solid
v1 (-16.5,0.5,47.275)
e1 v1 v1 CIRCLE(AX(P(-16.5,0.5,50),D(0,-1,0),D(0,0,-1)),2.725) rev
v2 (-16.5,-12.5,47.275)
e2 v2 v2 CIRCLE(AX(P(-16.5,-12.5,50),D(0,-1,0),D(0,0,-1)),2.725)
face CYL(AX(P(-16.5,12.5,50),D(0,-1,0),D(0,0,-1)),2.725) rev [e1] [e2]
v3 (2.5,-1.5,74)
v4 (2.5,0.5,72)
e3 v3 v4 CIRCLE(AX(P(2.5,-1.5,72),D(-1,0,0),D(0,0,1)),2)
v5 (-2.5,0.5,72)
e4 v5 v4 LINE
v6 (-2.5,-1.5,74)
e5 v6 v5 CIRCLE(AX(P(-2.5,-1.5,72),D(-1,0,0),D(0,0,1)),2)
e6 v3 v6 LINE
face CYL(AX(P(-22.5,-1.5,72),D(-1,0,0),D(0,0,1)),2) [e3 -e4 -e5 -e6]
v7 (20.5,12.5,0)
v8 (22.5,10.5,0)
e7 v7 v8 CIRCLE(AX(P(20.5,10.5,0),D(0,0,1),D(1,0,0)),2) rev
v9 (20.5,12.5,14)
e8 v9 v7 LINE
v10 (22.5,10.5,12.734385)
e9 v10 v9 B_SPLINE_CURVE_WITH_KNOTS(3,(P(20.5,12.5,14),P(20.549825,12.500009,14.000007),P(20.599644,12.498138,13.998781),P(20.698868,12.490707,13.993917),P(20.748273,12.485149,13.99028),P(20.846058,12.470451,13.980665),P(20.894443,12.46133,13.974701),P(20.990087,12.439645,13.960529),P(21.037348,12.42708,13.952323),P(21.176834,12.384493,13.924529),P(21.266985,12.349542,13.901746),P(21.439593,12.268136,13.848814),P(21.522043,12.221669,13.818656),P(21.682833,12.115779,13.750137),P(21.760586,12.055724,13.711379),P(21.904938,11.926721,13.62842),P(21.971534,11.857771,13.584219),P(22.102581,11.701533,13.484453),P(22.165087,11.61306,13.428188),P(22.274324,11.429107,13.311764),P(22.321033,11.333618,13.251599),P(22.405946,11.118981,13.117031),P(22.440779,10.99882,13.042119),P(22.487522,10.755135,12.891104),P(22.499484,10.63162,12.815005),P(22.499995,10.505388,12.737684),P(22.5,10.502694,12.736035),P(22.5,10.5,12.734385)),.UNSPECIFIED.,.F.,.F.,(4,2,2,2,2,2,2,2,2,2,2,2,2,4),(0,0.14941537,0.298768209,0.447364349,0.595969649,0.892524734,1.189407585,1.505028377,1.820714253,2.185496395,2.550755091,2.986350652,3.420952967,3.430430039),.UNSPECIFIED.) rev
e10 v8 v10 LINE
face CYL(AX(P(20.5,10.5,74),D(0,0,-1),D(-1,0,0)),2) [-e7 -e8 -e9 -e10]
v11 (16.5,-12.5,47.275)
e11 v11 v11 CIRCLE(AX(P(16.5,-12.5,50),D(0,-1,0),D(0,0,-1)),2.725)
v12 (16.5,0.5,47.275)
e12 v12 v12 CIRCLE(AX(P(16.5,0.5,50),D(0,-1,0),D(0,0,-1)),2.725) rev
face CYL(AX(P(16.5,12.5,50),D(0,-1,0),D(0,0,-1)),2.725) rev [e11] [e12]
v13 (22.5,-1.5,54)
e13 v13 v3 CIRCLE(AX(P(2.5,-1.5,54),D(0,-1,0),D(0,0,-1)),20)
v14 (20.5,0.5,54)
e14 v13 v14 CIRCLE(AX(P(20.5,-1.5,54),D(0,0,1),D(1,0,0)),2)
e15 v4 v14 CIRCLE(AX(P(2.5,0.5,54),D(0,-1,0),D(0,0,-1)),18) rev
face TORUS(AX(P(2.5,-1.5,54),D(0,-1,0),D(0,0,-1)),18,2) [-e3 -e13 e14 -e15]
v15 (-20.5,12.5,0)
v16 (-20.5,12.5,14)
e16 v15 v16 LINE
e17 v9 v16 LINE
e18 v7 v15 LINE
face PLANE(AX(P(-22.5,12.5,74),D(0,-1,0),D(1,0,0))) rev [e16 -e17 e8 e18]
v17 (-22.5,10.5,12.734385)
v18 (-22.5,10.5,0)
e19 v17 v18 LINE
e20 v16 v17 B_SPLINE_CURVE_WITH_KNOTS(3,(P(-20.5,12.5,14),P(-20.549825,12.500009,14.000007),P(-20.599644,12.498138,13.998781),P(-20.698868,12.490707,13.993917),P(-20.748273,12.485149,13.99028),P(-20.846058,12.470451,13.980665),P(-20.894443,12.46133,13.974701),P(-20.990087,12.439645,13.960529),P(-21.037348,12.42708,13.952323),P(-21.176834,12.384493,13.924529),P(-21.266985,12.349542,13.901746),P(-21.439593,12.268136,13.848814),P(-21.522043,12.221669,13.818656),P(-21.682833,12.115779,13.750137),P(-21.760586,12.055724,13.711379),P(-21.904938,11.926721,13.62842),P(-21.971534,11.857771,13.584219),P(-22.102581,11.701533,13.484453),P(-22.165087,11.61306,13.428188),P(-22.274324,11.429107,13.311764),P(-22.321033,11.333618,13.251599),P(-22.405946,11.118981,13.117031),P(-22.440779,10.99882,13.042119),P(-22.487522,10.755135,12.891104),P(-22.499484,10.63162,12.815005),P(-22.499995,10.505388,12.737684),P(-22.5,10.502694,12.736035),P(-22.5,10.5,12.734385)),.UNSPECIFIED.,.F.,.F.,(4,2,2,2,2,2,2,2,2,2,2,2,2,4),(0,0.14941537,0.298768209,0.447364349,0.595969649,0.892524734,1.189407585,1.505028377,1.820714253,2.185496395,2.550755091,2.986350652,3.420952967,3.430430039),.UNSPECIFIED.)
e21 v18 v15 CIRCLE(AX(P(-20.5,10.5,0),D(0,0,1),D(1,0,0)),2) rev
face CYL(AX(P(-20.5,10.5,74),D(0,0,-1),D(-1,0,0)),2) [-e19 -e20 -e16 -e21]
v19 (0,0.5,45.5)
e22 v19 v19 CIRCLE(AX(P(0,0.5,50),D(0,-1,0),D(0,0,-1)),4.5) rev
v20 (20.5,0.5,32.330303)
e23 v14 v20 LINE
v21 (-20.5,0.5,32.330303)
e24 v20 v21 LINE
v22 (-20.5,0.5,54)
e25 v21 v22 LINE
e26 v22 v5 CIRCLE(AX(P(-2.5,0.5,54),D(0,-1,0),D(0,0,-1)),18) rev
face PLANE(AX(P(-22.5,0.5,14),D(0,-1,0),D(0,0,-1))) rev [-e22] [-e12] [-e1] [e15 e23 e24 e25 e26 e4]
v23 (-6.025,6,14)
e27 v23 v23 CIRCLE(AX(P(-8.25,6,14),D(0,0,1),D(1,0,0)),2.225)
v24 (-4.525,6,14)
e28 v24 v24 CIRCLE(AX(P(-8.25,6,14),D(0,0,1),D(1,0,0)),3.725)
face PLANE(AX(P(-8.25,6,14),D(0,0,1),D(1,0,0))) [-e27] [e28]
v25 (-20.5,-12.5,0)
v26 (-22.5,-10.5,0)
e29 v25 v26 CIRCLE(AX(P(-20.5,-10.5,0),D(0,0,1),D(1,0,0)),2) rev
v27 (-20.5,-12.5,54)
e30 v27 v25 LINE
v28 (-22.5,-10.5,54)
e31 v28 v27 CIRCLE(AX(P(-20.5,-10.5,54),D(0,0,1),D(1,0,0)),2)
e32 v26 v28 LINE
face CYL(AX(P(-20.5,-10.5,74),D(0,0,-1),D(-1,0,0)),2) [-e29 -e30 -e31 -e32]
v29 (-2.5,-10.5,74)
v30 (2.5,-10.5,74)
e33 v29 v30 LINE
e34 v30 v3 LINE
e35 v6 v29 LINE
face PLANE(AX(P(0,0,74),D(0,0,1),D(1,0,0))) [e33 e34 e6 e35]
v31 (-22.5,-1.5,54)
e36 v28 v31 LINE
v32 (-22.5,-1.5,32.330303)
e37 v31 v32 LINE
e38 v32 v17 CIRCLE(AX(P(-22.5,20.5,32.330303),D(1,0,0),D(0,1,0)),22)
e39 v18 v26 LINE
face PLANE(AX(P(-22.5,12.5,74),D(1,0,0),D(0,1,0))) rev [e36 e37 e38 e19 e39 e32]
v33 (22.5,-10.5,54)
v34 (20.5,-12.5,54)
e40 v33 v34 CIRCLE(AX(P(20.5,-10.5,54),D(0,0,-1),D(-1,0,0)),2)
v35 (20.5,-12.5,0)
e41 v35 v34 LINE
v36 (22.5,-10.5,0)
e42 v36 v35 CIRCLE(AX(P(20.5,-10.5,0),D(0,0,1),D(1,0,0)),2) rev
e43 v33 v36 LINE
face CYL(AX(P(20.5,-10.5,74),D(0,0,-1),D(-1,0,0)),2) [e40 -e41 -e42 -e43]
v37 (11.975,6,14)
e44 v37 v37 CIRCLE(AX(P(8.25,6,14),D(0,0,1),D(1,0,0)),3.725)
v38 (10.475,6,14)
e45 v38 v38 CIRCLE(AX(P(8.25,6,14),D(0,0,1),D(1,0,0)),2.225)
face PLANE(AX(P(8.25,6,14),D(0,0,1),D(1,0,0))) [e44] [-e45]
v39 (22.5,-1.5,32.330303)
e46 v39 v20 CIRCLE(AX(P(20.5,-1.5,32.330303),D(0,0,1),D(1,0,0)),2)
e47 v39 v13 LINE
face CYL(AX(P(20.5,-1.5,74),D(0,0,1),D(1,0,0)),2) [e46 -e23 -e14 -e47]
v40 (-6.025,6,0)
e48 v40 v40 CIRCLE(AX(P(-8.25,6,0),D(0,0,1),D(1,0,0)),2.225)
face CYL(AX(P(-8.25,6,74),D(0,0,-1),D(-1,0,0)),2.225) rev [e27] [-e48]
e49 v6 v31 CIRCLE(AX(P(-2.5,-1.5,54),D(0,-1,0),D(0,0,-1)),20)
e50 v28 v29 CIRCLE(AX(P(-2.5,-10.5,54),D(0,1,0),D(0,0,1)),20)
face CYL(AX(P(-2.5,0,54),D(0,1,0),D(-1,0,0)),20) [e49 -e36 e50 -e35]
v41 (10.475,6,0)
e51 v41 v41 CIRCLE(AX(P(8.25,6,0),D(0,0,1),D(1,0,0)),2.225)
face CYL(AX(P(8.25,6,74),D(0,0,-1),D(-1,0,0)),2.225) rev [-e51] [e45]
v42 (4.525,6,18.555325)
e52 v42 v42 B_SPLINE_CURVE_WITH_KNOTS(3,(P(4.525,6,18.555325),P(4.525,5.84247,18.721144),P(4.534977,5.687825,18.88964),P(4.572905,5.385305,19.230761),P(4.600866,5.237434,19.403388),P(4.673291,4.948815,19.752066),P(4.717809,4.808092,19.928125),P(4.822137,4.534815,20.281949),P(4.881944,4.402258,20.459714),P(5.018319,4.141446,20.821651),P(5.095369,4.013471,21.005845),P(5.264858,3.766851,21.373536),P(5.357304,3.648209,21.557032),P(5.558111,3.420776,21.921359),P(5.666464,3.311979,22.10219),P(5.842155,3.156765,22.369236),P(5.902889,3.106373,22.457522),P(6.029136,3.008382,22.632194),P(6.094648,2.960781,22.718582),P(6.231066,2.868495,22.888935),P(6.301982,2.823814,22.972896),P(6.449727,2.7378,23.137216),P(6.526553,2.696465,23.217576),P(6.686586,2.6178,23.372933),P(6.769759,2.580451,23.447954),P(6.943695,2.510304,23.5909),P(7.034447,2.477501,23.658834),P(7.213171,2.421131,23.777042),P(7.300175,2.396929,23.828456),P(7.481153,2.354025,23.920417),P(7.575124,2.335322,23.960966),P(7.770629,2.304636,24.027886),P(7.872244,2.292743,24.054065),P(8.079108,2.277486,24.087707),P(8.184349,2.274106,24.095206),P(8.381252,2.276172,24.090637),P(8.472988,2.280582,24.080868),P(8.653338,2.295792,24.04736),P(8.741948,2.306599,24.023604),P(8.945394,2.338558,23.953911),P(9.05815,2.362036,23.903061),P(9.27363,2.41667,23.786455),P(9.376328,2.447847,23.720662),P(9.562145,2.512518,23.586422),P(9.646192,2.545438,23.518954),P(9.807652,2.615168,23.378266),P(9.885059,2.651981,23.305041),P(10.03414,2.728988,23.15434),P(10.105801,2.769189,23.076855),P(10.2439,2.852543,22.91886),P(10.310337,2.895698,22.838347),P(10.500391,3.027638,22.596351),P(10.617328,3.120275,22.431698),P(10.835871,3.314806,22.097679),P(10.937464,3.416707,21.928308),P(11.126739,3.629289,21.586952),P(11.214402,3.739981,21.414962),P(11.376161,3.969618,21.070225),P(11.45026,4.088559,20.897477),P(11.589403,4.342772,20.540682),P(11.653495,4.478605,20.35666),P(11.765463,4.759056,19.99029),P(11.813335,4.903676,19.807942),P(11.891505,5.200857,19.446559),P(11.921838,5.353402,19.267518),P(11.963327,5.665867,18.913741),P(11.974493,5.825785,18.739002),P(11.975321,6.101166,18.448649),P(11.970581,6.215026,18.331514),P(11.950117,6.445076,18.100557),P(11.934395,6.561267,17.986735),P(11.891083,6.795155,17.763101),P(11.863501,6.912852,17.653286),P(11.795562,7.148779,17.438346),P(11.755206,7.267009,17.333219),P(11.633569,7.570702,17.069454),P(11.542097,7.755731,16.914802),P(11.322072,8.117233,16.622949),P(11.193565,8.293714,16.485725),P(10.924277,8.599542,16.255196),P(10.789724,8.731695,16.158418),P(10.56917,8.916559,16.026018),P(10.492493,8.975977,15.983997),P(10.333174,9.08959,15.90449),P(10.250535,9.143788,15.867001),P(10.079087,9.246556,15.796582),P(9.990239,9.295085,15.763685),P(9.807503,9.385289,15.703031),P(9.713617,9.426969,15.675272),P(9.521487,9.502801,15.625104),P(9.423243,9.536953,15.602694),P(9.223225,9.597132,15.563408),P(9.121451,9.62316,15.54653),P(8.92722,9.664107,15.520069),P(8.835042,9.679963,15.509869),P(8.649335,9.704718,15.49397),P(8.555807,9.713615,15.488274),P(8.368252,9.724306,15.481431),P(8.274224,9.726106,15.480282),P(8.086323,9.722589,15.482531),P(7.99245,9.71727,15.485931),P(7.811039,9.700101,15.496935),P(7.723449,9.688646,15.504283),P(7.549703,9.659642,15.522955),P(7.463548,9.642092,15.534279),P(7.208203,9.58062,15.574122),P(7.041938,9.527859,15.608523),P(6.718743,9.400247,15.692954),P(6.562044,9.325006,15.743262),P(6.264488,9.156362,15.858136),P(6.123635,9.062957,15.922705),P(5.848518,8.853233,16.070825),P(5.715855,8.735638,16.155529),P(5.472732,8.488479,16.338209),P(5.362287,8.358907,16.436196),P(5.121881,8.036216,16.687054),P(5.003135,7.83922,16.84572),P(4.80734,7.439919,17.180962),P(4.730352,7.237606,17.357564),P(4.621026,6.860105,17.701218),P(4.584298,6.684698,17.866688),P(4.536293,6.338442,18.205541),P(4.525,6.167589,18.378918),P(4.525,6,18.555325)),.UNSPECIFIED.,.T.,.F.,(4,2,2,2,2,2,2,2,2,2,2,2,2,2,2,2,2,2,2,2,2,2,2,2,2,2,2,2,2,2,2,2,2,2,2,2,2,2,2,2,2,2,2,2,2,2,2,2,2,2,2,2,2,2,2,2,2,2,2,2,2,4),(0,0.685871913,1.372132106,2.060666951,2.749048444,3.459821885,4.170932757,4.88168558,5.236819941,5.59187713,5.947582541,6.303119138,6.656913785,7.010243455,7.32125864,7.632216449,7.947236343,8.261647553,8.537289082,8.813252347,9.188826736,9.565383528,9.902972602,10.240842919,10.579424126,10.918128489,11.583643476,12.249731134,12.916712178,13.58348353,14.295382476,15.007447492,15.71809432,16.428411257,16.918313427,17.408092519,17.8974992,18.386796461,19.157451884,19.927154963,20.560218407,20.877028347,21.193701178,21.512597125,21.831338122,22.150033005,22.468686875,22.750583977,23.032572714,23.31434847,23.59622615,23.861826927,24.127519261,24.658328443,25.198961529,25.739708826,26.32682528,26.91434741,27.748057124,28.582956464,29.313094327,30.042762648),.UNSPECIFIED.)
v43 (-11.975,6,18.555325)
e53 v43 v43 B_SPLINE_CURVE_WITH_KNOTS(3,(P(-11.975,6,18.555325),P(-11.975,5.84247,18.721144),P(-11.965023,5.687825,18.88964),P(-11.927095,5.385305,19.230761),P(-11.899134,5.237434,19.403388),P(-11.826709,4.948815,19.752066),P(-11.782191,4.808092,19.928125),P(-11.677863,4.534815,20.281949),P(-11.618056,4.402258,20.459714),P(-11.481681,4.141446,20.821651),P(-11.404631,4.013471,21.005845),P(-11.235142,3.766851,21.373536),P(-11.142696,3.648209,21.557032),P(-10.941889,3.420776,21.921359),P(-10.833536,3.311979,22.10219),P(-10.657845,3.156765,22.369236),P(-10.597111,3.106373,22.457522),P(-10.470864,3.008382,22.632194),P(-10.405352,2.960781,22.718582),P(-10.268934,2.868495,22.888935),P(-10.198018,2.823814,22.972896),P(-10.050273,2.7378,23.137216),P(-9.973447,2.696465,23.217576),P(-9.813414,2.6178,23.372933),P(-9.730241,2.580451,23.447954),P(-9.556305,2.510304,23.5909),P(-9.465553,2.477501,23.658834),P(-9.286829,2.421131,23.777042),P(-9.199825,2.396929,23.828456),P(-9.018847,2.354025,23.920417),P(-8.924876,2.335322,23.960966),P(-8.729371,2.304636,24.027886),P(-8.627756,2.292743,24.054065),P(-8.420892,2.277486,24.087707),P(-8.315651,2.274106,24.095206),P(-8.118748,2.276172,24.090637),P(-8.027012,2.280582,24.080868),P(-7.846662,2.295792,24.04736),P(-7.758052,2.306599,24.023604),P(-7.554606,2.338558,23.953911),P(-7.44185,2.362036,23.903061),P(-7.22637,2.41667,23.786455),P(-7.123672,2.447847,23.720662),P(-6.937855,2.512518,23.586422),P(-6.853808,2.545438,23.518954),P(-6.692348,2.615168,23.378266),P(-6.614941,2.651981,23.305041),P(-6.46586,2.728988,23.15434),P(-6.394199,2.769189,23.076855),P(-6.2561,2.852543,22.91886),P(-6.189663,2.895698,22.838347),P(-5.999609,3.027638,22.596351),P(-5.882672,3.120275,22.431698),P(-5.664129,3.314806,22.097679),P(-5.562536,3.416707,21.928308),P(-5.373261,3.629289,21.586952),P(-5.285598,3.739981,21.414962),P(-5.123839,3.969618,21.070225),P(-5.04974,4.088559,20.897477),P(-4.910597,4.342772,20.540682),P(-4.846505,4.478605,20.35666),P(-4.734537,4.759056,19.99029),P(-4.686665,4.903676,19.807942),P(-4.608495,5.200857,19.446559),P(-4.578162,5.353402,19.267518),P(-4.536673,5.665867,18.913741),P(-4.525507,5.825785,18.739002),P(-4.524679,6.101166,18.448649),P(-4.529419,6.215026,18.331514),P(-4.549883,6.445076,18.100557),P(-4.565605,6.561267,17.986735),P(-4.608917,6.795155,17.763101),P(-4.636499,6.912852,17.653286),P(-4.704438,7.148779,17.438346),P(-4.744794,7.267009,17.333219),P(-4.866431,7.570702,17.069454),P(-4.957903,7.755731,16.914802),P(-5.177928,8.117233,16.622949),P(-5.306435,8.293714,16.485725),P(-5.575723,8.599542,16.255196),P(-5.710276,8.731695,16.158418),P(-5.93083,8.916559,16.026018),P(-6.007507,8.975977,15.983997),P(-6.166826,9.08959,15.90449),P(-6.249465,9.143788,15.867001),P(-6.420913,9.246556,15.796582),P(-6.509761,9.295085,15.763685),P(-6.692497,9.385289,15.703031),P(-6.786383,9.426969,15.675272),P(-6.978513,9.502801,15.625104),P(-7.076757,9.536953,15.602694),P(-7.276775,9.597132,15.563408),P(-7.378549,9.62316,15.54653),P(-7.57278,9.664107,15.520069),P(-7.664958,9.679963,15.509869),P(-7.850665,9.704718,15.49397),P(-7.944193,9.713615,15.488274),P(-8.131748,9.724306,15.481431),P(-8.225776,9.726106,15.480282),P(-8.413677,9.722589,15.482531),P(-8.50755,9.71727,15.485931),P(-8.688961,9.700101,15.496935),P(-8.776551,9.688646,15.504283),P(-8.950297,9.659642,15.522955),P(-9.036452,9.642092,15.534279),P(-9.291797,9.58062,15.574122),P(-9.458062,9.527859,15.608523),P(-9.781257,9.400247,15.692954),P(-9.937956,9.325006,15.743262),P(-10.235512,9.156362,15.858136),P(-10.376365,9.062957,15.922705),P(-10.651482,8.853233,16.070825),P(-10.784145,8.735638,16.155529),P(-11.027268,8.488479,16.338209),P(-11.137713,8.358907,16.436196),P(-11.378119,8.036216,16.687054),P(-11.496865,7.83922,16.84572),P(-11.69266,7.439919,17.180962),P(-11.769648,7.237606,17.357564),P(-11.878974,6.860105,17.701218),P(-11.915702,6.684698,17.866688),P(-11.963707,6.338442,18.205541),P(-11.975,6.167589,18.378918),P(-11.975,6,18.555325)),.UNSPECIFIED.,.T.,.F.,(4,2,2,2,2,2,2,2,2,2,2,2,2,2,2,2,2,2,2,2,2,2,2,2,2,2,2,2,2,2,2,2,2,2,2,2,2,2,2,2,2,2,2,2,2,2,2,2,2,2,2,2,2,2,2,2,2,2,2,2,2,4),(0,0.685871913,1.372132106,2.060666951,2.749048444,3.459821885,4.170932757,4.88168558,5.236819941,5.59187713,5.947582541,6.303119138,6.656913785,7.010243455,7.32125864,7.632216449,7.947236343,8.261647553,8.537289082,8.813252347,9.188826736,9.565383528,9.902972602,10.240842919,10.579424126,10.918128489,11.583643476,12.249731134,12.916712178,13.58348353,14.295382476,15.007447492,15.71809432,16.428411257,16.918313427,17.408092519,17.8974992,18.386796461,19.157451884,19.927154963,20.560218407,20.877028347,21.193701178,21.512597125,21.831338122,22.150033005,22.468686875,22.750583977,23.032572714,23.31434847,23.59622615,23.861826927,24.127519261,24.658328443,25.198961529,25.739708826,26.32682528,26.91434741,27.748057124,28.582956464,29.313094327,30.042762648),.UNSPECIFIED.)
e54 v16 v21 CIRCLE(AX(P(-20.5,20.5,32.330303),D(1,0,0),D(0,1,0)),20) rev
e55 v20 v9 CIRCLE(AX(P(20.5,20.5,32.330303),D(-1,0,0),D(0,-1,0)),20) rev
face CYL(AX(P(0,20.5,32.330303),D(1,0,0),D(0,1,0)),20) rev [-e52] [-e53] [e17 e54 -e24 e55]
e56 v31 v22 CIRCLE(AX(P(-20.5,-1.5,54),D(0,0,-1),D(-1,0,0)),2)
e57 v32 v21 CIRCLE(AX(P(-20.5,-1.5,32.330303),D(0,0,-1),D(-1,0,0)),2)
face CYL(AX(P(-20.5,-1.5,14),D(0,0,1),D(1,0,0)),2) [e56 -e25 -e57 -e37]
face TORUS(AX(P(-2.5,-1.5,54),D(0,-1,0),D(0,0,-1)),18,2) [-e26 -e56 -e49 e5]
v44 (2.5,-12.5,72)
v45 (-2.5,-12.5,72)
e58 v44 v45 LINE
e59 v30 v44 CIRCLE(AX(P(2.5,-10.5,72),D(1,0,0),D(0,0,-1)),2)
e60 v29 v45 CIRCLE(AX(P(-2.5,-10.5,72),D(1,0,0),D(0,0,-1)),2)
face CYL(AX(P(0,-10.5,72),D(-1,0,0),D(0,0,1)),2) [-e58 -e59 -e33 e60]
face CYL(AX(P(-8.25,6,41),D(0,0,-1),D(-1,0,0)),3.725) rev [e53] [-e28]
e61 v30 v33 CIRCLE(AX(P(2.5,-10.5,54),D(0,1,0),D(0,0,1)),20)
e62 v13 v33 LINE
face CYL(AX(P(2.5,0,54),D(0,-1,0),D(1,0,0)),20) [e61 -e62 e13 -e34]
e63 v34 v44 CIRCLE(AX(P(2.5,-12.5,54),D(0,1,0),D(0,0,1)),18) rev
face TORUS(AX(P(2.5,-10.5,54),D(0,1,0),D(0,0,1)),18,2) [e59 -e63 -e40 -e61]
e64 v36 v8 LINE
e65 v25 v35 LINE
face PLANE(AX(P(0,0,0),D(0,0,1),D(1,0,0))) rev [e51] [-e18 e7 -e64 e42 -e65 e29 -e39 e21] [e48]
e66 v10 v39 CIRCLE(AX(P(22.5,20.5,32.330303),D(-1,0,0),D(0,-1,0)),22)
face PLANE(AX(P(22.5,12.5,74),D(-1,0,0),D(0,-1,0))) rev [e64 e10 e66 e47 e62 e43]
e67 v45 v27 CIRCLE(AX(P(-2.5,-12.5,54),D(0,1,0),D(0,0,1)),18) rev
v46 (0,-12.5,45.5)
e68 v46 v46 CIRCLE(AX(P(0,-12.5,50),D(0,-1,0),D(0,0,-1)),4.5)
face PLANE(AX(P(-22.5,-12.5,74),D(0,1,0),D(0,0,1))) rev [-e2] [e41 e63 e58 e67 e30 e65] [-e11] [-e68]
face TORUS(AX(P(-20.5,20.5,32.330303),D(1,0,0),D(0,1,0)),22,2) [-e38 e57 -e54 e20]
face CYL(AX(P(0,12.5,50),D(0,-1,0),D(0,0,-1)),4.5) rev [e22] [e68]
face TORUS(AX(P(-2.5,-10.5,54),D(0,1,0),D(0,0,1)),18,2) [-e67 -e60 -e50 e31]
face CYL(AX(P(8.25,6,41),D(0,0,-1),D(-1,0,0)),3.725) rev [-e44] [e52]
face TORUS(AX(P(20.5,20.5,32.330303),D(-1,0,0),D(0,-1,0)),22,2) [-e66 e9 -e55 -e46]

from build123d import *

# Parameters (mm, degrees)
SKETCH1_W           = 45
SKETCH1_H           = 25
SKETCH1_R           = 2.225
BOSS_EXTRUDE1_DEPTH = 74
SKETCH2_R           = 4.5
SKETCH2_R_2         = 2.725
CUT_EXTRUDE1_DEPTH  = 82.284992465
SKETCH3_W           = 45
SKETCH3_H           = 12
CUT_EXTRUDE2_DEPTH  = 60
FILLET4_R           = 20
SKETCH4_R           = 3.725
CUT_EXTRUDE4_DEPTH  = 27
FILLET5_R           = 20
FILLET6_R           = 2


with BuildPart() as part:
    # Sketch1 → Boss-Extrude1 (new body)
    with BuildSketch(Plane.XY):
        Rectangle(SKETCH1_W, SKETCH1_H)
        with Locations((-8.25, 6)):
            Circle(SKETCH1_R, mode=Mode.SUBTRACT)
        with Locations((8.25, 6)):
            Circle(SKETCH1_R, mode=Mode.SUBTRACT)
    extrude(amount=BOSS_EXTRUDE1_DEPTH)

    # Sketch2 → Cut-Extrude1 (cut, through all)
    with BuildSketch(Plane.XZ.offset(12.5)):
        with Locations(Location((0, 50, 0), (0, 0, 270))):
            Circle(SKETCH2_R)
        with Locations(Location((-16.5, 50, 0), (0, 0, 270))):
            Circle(SKETCH2_R_2)
        with Locations(Location((16.5, 50, 0), (0, 0, 270))):
            Circle(SKETCH2_R_2)
    extrude(amount=-CUT_EXTRUDE1_DEPTH, mode=Mode.SUBTRACT)

    # Sketch3 → Cut-Extrude2 (cut)
    with BuildSketch(Plane.XY.offset(74)):
        with Locations((0, 6.5)):
            Rectangle(SKETCH3_W, SKETCH3_H)
    extrude(amount=-CUT_EXTRUDE2_DEPTH, mode=Mode.SUBTRACT)

    # Fillet4
    # the kernel refuses this fillet: 20 mm, written as the material it adds along each edge
    with BuildSketch(Plane(origin=(22.5, 0.5, 14), x_dir=(0, 1, 0), z_dir=(-1, 0, 0))) as fillet4_piece_1_section:
        with BuildLine():
            CenterArc((20, -18.33030278), FILLET4_R, 113.578178478, 66.421821522)
            Line((0, -18.33030278), (-0.4, -18.33030278))
            Line((-0.4, -18.33030278), (-0.4, 0))
            Line((-0.4, 0), (0, 0.4))
            ThreePointArc((0, 0.4), (6, 0.4), (11.84, 0.366606056))
            Line((11.84, 0.366606056), (12, 0))
        make_face()
    fillet4_piece_1 = extrude(amount=45, mode=Mode.PRIVATE)
    fillet4_piece_1 = fillet4_piece_1 - Plane(origin=(8.25, 6, 18.573304712), x_dir=(1, 0, 0), z_dir=(0, 0, -1)) * Cylinder(2.225, 164, mode=Mode.PRIVATE)
    fillet4_piece_1 = fillet4_piece_1 - Plane(origin=(-8.25, 6, 18.573304712), x_dir=(1, 0, 0), z_dir=(0, 0, -1)) * Cylinder(2.225, 164, mode=Mode.PRIVATE)
    add(fillet4_piece_1)

    # Sketch4 → Cut-Extrude4 (cut)
    with BuildSketch(Plane.XY.offset(14)):
        with Locations(Location((-8.25, 6, 0), (0, 0, 180))):
            Circle(SKETCH4_R)
        with Locations(Location((8.25, 6, 0), (0, 0, 180))):
            Circle(SKETCH4_R)
    extrude(amount=CUT_EXTRUDE4_DEPTH, mode=Mode.SUBTRACT)

    # Fillet5
    fillet5_edges = [part.edges().sort_by_distance(p)[0] for p in [
        (-22.5, -6, 74),
        (22.5, -6, 74),
    ]]
    fillet(fillet5_edges, radius=FILLET5_R)

    # Fillet6
    fillet6_edges = [part.edges().sort_by_distance(p)[0] for p in [
        (-22.5, 12.5, 7),
        (22.5, 12.5, 7),
        (22.5, 0.5, 43.16515139),
        (-22.5, 0.5, 43.16515139),
        (22.5, 3.766799469, 21.37585163),
        (-22.5, 3.766799469, 21.37585163),
        (0, 0.5, 74),
        (0, -12.5, 74),
        (-16.642135624, 0.5, 68.142135624),
        (16.642135624, 0.5, 68.142135624),
        (22.5, -12.5, 27),
        (-22.5, -12.5, 27),
        (-16.642135624, -12.5, 68.142135624),
        (16.642135624, -12.5, 68.142135624),
    ]]
    fillet(fillet6_edges, radius=FILLET6_R)


solid = part.part
